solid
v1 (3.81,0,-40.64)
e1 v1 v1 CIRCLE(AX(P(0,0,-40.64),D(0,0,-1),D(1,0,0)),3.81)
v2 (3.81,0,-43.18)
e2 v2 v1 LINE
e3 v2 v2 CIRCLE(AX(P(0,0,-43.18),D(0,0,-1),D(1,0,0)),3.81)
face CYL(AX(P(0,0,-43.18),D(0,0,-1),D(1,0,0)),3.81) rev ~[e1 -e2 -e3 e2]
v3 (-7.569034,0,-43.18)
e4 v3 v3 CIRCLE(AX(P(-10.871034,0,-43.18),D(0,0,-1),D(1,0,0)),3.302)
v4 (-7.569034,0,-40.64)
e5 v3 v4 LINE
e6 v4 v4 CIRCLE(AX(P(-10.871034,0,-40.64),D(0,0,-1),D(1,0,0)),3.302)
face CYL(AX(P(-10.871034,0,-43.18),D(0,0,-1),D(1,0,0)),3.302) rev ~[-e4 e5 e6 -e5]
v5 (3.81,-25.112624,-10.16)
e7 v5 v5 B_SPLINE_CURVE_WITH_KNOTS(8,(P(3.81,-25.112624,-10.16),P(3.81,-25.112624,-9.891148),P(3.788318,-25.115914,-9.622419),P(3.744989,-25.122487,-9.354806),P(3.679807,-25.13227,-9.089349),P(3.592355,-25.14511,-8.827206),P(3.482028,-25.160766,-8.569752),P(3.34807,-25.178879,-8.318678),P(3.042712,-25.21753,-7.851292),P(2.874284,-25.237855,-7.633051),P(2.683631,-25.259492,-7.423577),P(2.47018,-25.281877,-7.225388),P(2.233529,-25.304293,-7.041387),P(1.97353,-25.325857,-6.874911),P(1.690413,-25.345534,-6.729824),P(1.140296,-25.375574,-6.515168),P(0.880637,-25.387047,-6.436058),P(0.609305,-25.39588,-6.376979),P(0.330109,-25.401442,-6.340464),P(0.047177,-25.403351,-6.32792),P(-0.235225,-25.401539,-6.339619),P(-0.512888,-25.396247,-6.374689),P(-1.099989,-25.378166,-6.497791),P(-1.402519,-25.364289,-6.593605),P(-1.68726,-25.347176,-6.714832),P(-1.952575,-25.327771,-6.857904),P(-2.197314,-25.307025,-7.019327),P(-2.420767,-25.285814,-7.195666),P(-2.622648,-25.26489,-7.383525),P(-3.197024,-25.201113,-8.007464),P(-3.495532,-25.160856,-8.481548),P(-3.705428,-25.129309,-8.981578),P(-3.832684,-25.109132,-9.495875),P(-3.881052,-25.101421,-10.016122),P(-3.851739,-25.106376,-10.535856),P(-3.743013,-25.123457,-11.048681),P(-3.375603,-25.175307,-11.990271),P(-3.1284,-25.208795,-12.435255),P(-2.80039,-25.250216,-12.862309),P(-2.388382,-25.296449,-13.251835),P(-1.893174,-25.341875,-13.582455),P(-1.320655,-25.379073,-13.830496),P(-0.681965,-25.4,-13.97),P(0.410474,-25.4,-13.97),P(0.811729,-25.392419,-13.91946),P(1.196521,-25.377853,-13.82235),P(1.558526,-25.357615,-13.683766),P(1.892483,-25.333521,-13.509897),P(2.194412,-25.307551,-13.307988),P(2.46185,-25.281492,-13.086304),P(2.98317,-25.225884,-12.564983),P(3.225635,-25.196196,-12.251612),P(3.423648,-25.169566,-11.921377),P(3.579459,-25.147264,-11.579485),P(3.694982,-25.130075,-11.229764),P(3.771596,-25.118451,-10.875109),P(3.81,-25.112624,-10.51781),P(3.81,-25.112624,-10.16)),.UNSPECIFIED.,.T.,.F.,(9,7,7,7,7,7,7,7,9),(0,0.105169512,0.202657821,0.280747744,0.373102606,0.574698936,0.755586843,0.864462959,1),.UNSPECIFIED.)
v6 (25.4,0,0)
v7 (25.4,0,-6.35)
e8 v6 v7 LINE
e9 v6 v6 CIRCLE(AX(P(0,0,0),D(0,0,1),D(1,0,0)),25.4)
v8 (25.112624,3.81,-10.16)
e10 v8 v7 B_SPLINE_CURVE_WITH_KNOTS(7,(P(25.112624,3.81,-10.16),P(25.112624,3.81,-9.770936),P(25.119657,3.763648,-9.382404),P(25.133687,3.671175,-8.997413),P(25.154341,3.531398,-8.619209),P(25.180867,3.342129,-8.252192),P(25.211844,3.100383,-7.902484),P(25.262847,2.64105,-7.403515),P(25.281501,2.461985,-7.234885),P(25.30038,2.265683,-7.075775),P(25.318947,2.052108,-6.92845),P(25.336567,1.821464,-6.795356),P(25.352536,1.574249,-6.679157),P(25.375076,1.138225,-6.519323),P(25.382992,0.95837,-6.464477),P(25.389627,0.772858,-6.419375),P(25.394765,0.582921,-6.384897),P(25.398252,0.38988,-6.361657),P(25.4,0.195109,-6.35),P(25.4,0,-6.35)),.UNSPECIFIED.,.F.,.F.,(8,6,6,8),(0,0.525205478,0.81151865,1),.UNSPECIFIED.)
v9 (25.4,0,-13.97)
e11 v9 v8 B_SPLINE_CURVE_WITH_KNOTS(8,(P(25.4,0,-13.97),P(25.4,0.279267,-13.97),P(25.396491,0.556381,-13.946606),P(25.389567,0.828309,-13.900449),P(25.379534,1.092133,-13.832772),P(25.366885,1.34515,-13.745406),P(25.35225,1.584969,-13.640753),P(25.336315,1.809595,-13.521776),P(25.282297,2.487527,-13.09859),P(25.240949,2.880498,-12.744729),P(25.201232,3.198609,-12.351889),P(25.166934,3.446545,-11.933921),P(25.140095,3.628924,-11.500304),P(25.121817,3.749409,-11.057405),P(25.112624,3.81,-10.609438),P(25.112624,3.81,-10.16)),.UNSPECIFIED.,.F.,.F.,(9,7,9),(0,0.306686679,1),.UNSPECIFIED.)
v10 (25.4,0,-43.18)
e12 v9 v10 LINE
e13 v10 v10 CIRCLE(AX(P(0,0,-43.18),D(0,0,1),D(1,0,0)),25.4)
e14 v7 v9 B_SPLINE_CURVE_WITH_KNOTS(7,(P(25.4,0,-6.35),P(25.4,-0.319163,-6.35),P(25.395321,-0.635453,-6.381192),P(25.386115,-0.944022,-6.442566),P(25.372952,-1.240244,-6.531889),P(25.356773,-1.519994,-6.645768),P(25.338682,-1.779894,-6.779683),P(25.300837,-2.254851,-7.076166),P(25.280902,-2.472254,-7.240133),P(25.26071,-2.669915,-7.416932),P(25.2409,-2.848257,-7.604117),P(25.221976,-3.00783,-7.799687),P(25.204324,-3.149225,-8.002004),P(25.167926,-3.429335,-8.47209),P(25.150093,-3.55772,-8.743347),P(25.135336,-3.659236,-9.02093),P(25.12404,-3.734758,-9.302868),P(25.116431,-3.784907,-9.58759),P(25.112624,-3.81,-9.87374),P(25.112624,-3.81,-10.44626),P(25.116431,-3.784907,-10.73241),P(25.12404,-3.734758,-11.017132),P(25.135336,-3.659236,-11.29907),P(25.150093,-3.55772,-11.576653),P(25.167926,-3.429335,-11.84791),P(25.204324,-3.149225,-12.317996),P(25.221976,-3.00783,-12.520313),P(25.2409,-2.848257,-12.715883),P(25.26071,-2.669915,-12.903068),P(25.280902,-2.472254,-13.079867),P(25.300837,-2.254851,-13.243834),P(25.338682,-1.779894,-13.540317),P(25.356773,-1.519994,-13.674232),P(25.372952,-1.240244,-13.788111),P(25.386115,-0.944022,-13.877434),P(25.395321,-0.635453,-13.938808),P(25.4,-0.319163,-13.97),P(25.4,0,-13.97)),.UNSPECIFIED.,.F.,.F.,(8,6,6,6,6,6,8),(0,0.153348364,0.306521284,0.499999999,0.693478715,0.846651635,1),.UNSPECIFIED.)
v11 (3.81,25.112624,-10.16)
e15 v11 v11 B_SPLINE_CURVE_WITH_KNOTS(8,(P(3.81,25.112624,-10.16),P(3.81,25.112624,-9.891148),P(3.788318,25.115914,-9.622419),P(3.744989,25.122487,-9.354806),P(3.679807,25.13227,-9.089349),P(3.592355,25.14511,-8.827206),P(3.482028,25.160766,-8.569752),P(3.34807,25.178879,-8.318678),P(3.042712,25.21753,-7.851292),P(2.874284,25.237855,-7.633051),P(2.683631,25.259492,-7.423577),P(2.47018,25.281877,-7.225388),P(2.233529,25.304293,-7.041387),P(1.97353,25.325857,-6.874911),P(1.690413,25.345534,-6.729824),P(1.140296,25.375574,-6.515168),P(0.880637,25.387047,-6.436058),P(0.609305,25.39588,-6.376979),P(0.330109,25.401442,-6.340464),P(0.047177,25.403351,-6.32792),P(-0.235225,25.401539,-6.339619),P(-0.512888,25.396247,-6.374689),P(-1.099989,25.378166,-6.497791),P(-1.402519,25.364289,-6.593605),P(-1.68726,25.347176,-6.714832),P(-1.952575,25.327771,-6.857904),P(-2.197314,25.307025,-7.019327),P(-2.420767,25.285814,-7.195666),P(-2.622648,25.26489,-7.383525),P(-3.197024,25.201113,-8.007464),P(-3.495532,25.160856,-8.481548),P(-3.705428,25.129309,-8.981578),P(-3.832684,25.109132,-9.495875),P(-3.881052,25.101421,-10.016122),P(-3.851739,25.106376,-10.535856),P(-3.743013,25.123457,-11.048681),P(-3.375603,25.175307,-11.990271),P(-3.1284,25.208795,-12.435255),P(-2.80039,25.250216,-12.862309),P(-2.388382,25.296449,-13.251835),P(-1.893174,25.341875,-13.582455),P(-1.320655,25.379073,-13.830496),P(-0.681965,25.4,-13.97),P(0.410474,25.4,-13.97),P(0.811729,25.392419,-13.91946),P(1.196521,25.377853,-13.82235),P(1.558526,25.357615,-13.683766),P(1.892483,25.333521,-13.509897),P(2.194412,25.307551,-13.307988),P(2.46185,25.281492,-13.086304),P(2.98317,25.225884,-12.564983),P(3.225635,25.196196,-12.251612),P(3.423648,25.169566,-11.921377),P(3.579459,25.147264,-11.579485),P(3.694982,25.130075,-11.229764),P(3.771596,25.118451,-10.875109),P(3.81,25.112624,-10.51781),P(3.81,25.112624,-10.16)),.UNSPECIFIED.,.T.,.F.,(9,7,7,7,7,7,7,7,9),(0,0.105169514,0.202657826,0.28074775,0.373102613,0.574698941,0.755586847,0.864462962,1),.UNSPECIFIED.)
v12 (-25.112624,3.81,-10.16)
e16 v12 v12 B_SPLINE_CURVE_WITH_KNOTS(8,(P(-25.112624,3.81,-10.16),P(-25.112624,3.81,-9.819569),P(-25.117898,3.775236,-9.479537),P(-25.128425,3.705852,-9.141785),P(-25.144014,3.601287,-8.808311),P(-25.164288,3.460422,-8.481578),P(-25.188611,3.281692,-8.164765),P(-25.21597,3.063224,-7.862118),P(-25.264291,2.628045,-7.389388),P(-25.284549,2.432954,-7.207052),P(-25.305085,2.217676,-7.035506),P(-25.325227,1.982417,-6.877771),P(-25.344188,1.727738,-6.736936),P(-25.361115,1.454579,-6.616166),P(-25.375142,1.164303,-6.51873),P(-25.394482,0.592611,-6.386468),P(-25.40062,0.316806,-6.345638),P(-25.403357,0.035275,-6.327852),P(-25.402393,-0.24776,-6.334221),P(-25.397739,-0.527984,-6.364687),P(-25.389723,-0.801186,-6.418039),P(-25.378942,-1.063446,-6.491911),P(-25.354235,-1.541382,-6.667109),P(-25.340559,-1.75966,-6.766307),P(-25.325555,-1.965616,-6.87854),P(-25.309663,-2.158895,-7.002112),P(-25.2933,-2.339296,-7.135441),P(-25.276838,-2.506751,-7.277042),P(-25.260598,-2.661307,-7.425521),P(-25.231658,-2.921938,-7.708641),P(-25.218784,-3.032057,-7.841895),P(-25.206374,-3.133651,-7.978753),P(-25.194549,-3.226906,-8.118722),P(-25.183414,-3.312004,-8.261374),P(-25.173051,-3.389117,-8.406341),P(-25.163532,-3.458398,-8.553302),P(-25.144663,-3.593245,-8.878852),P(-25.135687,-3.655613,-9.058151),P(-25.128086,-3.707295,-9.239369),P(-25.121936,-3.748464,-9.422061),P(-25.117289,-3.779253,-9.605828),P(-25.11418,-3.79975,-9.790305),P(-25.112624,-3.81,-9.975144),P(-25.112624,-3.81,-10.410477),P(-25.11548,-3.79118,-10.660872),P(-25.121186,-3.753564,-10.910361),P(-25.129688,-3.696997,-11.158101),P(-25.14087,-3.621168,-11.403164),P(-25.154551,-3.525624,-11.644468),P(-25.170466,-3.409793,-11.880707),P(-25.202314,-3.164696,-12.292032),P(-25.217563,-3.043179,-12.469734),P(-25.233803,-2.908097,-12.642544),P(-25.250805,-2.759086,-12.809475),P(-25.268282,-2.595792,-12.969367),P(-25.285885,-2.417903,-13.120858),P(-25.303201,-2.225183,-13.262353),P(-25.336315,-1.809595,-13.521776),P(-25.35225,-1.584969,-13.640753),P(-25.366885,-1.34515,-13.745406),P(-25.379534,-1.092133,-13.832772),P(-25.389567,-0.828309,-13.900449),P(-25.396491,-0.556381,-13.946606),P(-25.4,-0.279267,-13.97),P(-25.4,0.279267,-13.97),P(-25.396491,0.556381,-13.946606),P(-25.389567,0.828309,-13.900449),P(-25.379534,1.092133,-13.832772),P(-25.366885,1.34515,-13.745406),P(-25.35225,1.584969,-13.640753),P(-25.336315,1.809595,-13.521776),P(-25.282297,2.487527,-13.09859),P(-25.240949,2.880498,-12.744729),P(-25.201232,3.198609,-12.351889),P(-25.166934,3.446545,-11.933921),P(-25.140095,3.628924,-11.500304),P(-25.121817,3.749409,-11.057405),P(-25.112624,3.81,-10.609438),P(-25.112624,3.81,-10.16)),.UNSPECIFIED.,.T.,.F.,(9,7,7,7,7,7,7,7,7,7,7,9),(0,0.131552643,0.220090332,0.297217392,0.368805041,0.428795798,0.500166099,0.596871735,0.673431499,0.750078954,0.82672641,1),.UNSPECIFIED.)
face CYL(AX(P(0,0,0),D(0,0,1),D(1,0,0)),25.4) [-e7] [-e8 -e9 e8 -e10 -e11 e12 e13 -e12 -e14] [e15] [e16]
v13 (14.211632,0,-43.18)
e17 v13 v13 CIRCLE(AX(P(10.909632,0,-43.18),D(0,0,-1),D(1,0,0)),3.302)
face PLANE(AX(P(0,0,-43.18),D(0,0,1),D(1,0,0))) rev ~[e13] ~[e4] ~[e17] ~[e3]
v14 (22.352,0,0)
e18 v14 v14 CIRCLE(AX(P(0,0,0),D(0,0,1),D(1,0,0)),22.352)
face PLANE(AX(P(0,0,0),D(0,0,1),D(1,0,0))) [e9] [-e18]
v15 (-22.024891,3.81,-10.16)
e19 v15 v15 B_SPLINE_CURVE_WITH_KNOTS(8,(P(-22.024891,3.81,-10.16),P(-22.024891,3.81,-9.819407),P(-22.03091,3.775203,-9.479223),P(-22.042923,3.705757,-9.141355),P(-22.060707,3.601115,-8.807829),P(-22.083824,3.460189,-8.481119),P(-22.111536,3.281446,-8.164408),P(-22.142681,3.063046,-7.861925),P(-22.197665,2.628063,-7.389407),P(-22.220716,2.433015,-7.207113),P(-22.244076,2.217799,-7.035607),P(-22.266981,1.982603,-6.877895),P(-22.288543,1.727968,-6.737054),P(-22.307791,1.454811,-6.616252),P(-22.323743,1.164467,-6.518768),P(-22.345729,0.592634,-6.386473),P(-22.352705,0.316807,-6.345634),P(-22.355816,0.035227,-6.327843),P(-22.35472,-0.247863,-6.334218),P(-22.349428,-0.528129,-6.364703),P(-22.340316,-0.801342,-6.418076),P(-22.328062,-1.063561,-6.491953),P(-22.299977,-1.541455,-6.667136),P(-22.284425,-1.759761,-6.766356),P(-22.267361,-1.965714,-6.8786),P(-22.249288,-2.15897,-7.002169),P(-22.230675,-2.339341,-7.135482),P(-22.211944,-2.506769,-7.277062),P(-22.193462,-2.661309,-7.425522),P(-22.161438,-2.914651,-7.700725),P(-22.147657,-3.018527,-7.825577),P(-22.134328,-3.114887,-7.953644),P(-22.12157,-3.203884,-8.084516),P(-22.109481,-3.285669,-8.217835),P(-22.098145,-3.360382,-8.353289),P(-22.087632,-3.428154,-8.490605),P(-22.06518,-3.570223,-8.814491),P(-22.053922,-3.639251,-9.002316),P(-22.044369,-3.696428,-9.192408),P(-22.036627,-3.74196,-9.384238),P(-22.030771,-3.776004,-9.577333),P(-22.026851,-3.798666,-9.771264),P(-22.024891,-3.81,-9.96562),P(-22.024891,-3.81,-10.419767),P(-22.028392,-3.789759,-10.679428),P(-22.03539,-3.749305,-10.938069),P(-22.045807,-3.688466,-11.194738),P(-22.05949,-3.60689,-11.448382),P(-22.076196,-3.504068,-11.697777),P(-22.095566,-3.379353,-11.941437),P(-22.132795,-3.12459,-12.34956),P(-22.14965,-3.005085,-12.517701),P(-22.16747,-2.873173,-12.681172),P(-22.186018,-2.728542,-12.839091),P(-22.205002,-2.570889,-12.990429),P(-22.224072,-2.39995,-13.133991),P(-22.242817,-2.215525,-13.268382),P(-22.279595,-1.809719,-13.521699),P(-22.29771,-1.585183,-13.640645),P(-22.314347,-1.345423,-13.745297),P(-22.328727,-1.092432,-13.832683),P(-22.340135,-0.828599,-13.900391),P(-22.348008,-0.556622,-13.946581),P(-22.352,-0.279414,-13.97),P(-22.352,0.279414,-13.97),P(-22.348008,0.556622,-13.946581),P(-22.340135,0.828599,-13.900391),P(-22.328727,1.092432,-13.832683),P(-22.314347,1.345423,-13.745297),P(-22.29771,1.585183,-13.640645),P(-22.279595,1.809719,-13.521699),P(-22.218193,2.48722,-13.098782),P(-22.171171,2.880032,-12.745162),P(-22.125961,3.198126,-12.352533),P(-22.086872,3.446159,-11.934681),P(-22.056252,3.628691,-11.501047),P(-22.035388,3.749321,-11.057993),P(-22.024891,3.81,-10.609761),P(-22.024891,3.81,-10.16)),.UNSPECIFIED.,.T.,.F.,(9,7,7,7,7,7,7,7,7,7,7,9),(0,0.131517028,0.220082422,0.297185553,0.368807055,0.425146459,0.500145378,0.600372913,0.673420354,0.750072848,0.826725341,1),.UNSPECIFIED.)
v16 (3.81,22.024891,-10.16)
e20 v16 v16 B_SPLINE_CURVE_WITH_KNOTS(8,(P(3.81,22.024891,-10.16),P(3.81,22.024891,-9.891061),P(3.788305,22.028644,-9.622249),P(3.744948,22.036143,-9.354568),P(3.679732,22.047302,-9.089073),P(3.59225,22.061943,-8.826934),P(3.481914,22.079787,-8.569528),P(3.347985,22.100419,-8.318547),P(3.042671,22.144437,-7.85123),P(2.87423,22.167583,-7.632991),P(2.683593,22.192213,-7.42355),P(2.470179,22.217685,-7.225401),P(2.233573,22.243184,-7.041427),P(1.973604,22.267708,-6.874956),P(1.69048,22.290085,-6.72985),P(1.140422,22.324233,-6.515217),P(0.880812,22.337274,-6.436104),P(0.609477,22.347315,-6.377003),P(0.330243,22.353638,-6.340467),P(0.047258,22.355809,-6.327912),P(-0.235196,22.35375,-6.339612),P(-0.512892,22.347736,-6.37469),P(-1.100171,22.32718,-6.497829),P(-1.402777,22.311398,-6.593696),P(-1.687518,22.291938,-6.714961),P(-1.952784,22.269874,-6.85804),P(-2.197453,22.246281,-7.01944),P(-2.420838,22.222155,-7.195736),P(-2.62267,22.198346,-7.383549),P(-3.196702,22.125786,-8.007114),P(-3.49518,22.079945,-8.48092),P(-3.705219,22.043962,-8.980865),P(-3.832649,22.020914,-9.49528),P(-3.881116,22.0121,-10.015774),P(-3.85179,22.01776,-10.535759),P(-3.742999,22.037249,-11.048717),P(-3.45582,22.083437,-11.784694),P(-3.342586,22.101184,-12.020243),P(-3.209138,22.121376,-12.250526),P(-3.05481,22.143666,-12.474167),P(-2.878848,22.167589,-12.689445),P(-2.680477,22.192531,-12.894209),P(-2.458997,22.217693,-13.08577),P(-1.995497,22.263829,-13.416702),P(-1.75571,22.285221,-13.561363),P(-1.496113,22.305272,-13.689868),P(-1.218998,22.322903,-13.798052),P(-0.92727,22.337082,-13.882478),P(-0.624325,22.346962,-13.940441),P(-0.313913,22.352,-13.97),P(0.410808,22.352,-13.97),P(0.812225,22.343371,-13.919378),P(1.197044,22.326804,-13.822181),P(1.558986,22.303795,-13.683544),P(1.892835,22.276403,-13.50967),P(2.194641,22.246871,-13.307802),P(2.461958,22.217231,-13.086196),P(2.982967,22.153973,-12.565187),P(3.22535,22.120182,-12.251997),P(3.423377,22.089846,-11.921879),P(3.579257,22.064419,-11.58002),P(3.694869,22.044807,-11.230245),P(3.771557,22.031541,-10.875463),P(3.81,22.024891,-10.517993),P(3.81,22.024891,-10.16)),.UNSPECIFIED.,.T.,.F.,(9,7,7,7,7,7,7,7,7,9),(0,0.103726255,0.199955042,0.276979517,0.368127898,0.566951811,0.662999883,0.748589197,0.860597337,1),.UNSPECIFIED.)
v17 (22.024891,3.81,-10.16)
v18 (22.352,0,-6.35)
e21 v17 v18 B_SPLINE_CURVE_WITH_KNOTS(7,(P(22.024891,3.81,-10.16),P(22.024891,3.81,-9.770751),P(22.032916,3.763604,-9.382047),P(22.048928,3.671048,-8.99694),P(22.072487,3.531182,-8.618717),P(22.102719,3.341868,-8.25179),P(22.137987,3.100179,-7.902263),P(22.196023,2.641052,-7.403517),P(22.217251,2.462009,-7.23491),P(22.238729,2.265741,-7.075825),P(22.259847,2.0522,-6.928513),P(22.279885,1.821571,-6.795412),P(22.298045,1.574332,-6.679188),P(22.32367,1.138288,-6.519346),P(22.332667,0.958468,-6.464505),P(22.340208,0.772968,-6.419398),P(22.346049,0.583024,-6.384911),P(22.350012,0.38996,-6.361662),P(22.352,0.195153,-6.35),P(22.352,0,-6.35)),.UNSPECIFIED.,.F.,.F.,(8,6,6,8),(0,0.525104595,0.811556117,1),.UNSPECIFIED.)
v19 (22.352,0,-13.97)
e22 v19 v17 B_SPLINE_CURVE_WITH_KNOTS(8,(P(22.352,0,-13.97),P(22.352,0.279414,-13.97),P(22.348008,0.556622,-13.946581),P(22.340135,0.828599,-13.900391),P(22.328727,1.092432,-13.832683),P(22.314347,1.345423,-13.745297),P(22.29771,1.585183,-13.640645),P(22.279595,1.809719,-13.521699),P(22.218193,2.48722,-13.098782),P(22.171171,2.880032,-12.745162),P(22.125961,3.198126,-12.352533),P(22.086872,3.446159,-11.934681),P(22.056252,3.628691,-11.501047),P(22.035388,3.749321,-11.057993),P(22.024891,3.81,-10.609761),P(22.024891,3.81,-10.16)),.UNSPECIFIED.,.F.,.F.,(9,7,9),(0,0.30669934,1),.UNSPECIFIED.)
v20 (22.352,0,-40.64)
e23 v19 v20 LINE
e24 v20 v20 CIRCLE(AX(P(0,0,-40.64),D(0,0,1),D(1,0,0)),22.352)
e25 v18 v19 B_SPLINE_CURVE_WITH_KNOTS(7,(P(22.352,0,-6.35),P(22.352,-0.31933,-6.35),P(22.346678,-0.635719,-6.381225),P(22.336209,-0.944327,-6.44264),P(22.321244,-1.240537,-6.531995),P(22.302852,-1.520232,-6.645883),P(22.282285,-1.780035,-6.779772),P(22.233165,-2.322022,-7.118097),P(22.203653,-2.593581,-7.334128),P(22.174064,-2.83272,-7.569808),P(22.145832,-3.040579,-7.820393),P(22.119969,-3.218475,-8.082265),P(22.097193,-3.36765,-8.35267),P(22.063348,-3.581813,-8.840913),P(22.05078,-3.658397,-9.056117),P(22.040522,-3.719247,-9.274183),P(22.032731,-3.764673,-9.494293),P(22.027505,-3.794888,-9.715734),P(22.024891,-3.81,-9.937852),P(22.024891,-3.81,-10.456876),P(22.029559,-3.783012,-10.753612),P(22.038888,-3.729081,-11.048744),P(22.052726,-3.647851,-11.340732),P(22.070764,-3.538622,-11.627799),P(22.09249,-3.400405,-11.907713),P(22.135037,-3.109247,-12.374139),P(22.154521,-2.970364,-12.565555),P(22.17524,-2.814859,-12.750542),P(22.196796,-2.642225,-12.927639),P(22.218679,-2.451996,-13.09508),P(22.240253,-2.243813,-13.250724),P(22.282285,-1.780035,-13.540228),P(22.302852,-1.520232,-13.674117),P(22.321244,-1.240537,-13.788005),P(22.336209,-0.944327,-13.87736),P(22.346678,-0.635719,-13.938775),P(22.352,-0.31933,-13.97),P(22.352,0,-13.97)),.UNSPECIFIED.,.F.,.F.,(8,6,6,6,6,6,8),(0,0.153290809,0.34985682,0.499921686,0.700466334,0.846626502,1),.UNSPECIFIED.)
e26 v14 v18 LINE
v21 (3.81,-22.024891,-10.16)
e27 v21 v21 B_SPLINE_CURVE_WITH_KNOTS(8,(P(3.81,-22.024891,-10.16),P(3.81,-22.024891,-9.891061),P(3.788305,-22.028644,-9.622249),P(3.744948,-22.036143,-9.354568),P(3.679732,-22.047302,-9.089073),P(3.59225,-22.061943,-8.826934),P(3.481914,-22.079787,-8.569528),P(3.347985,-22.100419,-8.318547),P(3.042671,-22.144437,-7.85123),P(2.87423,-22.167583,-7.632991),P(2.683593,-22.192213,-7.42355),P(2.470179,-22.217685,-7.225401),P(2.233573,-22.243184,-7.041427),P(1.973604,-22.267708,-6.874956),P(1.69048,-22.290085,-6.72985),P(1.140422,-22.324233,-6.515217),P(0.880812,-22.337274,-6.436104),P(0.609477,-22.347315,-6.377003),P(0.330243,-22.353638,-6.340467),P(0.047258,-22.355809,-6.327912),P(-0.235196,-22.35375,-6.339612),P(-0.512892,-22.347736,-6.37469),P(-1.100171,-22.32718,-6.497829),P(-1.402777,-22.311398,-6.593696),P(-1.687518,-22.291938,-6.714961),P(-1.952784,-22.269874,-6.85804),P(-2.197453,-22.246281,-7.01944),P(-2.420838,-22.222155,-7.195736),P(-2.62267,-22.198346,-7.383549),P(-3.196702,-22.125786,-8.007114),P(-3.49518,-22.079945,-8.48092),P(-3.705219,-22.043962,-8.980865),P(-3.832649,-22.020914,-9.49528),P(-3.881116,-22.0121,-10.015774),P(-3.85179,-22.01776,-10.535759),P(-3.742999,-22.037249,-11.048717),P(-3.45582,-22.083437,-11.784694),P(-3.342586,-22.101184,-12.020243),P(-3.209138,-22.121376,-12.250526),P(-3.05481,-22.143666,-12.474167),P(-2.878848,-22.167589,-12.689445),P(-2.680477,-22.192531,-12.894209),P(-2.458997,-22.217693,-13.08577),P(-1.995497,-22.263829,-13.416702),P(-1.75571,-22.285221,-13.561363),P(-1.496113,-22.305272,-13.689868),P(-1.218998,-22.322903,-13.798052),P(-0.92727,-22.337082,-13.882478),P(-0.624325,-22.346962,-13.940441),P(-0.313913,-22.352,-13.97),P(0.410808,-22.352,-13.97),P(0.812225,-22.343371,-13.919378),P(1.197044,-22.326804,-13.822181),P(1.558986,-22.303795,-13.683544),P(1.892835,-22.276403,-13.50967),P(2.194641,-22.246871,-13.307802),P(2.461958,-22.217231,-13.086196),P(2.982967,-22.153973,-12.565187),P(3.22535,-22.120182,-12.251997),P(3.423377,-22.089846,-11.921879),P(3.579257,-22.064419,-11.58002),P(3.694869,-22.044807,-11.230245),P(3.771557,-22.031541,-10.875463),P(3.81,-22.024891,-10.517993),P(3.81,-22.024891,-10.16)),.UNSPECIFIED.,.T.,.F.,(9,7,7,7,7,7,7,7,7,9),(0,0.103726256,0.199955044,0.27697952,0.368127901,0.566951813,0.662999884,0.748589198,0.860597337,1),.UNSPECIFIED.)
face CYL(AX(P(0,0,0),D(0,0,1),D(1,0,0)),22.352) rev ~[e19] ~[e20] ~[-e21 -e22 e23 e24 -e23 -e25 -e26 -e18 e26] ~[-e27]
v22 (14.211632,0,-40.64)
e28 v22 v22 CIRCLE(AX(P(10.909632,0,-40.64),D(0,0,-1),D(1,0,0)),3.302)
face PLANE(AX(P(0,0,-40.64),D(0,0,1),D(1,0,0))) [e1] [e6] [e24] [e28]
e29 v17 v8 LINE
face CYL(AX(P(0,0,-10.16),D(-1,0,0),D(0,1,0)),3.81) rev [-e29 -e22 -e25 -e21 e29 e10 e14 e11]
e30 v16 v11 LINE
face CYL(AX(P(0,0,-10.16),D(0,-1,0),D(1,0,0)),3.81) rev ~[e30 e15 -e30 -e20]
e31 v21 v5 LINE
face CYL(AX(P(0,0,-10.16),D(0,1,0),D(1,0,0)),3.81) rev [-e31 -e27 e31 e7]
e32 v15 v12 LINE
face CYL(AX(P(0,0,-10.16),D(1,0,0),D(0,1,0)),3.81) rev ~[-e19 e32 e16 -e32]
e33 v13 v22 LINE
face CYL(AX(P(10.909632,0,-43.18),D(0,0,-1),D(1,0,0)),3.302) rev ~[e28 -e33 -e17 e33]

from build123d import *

# Parameters (mm, degrees)
F0_R          = 25.4
F1_DEPTH      = 43.18
F2_R          = 3.81
F3_DEPTH      = 43.181
F4_R          = 3.81
F5_DEPTH      = 25.401
F5_DEPTH_BACK = 25.401
F6_R          = 3.81
F7_DEPTH      = 25.4010001
F7_DEPTH_BACK = 25.4010001
F8_R          = 3.302
F9_DEPTH      = 43.1810001
F10_R         = 22.352
F11_DEPTH     = 40.64


with BuildPart() as f1:
    # F0 (on Top) → F1 (new body)
    with BuildSketch(Plane.XY):
        Circle(F0_R)
    extrude(amount=-F1_DEPTH)

    # F2 (on face) → F3 (cut, through all)
    with BuildSketch(Plane(origin=(0, 0, -43.18), x_dir=(1, 0, 0), z_dir=(0, 0, -1))):
        Circle(F2_R)
    extrude(amount=-F3_DEPTH, mode=Mode.SUBTRACT)

    # F4 (on Right) → F5 (cut, two sides)
    with BuildSketch(Plane.YZ) as f5_sk:
        with Locations((0, -10.16)):
            Circle(F4_R)
    extrude(amount=-F5_DEPTH, mode=Mode.SUBTRACT)
    extrude(f5_sk.sketch, amount=F5_DEPTH_BACK, mode=Mode.SUBTRACT)

    # F6 (on Front) → F7 (cut, two sides)
    with BuildSketch(Plane.XZ) as f7_sk:
        with Locations((0, -10.16)):
            Circle(F6_R)
    extrude(amount=-F7_DEPTH, mode=Mode.SUBTRACT)
    extrude(f7_sk.sketch, amount=F7_DEPTH_BACK, mode=Mode.SUBTRACT)

    # F8 (on face) → F9 (cut, through all)
    with BuildSketch(Plane(origin=(0, 0, -43.18), x_dir=(1, 0, 0), z_dir=(0, 0, -1))):
        with Locations((10.9096324106, 0)):
            Circle(F8_R)
        with Locations((-10.8710342307, 0)):
            Circle(F8_R)
    extrude(amount=-F9_DEPTH, mode=Mode.SUBTRACT)

    # F10 (on face) → F11 (cut)
    with BuildSketch(Plane.XY):
        Circle(F10_R)
    extrude(amount=-F11_DEPTH, mode=Mode.SUBTRACT)


solid = f1.part
